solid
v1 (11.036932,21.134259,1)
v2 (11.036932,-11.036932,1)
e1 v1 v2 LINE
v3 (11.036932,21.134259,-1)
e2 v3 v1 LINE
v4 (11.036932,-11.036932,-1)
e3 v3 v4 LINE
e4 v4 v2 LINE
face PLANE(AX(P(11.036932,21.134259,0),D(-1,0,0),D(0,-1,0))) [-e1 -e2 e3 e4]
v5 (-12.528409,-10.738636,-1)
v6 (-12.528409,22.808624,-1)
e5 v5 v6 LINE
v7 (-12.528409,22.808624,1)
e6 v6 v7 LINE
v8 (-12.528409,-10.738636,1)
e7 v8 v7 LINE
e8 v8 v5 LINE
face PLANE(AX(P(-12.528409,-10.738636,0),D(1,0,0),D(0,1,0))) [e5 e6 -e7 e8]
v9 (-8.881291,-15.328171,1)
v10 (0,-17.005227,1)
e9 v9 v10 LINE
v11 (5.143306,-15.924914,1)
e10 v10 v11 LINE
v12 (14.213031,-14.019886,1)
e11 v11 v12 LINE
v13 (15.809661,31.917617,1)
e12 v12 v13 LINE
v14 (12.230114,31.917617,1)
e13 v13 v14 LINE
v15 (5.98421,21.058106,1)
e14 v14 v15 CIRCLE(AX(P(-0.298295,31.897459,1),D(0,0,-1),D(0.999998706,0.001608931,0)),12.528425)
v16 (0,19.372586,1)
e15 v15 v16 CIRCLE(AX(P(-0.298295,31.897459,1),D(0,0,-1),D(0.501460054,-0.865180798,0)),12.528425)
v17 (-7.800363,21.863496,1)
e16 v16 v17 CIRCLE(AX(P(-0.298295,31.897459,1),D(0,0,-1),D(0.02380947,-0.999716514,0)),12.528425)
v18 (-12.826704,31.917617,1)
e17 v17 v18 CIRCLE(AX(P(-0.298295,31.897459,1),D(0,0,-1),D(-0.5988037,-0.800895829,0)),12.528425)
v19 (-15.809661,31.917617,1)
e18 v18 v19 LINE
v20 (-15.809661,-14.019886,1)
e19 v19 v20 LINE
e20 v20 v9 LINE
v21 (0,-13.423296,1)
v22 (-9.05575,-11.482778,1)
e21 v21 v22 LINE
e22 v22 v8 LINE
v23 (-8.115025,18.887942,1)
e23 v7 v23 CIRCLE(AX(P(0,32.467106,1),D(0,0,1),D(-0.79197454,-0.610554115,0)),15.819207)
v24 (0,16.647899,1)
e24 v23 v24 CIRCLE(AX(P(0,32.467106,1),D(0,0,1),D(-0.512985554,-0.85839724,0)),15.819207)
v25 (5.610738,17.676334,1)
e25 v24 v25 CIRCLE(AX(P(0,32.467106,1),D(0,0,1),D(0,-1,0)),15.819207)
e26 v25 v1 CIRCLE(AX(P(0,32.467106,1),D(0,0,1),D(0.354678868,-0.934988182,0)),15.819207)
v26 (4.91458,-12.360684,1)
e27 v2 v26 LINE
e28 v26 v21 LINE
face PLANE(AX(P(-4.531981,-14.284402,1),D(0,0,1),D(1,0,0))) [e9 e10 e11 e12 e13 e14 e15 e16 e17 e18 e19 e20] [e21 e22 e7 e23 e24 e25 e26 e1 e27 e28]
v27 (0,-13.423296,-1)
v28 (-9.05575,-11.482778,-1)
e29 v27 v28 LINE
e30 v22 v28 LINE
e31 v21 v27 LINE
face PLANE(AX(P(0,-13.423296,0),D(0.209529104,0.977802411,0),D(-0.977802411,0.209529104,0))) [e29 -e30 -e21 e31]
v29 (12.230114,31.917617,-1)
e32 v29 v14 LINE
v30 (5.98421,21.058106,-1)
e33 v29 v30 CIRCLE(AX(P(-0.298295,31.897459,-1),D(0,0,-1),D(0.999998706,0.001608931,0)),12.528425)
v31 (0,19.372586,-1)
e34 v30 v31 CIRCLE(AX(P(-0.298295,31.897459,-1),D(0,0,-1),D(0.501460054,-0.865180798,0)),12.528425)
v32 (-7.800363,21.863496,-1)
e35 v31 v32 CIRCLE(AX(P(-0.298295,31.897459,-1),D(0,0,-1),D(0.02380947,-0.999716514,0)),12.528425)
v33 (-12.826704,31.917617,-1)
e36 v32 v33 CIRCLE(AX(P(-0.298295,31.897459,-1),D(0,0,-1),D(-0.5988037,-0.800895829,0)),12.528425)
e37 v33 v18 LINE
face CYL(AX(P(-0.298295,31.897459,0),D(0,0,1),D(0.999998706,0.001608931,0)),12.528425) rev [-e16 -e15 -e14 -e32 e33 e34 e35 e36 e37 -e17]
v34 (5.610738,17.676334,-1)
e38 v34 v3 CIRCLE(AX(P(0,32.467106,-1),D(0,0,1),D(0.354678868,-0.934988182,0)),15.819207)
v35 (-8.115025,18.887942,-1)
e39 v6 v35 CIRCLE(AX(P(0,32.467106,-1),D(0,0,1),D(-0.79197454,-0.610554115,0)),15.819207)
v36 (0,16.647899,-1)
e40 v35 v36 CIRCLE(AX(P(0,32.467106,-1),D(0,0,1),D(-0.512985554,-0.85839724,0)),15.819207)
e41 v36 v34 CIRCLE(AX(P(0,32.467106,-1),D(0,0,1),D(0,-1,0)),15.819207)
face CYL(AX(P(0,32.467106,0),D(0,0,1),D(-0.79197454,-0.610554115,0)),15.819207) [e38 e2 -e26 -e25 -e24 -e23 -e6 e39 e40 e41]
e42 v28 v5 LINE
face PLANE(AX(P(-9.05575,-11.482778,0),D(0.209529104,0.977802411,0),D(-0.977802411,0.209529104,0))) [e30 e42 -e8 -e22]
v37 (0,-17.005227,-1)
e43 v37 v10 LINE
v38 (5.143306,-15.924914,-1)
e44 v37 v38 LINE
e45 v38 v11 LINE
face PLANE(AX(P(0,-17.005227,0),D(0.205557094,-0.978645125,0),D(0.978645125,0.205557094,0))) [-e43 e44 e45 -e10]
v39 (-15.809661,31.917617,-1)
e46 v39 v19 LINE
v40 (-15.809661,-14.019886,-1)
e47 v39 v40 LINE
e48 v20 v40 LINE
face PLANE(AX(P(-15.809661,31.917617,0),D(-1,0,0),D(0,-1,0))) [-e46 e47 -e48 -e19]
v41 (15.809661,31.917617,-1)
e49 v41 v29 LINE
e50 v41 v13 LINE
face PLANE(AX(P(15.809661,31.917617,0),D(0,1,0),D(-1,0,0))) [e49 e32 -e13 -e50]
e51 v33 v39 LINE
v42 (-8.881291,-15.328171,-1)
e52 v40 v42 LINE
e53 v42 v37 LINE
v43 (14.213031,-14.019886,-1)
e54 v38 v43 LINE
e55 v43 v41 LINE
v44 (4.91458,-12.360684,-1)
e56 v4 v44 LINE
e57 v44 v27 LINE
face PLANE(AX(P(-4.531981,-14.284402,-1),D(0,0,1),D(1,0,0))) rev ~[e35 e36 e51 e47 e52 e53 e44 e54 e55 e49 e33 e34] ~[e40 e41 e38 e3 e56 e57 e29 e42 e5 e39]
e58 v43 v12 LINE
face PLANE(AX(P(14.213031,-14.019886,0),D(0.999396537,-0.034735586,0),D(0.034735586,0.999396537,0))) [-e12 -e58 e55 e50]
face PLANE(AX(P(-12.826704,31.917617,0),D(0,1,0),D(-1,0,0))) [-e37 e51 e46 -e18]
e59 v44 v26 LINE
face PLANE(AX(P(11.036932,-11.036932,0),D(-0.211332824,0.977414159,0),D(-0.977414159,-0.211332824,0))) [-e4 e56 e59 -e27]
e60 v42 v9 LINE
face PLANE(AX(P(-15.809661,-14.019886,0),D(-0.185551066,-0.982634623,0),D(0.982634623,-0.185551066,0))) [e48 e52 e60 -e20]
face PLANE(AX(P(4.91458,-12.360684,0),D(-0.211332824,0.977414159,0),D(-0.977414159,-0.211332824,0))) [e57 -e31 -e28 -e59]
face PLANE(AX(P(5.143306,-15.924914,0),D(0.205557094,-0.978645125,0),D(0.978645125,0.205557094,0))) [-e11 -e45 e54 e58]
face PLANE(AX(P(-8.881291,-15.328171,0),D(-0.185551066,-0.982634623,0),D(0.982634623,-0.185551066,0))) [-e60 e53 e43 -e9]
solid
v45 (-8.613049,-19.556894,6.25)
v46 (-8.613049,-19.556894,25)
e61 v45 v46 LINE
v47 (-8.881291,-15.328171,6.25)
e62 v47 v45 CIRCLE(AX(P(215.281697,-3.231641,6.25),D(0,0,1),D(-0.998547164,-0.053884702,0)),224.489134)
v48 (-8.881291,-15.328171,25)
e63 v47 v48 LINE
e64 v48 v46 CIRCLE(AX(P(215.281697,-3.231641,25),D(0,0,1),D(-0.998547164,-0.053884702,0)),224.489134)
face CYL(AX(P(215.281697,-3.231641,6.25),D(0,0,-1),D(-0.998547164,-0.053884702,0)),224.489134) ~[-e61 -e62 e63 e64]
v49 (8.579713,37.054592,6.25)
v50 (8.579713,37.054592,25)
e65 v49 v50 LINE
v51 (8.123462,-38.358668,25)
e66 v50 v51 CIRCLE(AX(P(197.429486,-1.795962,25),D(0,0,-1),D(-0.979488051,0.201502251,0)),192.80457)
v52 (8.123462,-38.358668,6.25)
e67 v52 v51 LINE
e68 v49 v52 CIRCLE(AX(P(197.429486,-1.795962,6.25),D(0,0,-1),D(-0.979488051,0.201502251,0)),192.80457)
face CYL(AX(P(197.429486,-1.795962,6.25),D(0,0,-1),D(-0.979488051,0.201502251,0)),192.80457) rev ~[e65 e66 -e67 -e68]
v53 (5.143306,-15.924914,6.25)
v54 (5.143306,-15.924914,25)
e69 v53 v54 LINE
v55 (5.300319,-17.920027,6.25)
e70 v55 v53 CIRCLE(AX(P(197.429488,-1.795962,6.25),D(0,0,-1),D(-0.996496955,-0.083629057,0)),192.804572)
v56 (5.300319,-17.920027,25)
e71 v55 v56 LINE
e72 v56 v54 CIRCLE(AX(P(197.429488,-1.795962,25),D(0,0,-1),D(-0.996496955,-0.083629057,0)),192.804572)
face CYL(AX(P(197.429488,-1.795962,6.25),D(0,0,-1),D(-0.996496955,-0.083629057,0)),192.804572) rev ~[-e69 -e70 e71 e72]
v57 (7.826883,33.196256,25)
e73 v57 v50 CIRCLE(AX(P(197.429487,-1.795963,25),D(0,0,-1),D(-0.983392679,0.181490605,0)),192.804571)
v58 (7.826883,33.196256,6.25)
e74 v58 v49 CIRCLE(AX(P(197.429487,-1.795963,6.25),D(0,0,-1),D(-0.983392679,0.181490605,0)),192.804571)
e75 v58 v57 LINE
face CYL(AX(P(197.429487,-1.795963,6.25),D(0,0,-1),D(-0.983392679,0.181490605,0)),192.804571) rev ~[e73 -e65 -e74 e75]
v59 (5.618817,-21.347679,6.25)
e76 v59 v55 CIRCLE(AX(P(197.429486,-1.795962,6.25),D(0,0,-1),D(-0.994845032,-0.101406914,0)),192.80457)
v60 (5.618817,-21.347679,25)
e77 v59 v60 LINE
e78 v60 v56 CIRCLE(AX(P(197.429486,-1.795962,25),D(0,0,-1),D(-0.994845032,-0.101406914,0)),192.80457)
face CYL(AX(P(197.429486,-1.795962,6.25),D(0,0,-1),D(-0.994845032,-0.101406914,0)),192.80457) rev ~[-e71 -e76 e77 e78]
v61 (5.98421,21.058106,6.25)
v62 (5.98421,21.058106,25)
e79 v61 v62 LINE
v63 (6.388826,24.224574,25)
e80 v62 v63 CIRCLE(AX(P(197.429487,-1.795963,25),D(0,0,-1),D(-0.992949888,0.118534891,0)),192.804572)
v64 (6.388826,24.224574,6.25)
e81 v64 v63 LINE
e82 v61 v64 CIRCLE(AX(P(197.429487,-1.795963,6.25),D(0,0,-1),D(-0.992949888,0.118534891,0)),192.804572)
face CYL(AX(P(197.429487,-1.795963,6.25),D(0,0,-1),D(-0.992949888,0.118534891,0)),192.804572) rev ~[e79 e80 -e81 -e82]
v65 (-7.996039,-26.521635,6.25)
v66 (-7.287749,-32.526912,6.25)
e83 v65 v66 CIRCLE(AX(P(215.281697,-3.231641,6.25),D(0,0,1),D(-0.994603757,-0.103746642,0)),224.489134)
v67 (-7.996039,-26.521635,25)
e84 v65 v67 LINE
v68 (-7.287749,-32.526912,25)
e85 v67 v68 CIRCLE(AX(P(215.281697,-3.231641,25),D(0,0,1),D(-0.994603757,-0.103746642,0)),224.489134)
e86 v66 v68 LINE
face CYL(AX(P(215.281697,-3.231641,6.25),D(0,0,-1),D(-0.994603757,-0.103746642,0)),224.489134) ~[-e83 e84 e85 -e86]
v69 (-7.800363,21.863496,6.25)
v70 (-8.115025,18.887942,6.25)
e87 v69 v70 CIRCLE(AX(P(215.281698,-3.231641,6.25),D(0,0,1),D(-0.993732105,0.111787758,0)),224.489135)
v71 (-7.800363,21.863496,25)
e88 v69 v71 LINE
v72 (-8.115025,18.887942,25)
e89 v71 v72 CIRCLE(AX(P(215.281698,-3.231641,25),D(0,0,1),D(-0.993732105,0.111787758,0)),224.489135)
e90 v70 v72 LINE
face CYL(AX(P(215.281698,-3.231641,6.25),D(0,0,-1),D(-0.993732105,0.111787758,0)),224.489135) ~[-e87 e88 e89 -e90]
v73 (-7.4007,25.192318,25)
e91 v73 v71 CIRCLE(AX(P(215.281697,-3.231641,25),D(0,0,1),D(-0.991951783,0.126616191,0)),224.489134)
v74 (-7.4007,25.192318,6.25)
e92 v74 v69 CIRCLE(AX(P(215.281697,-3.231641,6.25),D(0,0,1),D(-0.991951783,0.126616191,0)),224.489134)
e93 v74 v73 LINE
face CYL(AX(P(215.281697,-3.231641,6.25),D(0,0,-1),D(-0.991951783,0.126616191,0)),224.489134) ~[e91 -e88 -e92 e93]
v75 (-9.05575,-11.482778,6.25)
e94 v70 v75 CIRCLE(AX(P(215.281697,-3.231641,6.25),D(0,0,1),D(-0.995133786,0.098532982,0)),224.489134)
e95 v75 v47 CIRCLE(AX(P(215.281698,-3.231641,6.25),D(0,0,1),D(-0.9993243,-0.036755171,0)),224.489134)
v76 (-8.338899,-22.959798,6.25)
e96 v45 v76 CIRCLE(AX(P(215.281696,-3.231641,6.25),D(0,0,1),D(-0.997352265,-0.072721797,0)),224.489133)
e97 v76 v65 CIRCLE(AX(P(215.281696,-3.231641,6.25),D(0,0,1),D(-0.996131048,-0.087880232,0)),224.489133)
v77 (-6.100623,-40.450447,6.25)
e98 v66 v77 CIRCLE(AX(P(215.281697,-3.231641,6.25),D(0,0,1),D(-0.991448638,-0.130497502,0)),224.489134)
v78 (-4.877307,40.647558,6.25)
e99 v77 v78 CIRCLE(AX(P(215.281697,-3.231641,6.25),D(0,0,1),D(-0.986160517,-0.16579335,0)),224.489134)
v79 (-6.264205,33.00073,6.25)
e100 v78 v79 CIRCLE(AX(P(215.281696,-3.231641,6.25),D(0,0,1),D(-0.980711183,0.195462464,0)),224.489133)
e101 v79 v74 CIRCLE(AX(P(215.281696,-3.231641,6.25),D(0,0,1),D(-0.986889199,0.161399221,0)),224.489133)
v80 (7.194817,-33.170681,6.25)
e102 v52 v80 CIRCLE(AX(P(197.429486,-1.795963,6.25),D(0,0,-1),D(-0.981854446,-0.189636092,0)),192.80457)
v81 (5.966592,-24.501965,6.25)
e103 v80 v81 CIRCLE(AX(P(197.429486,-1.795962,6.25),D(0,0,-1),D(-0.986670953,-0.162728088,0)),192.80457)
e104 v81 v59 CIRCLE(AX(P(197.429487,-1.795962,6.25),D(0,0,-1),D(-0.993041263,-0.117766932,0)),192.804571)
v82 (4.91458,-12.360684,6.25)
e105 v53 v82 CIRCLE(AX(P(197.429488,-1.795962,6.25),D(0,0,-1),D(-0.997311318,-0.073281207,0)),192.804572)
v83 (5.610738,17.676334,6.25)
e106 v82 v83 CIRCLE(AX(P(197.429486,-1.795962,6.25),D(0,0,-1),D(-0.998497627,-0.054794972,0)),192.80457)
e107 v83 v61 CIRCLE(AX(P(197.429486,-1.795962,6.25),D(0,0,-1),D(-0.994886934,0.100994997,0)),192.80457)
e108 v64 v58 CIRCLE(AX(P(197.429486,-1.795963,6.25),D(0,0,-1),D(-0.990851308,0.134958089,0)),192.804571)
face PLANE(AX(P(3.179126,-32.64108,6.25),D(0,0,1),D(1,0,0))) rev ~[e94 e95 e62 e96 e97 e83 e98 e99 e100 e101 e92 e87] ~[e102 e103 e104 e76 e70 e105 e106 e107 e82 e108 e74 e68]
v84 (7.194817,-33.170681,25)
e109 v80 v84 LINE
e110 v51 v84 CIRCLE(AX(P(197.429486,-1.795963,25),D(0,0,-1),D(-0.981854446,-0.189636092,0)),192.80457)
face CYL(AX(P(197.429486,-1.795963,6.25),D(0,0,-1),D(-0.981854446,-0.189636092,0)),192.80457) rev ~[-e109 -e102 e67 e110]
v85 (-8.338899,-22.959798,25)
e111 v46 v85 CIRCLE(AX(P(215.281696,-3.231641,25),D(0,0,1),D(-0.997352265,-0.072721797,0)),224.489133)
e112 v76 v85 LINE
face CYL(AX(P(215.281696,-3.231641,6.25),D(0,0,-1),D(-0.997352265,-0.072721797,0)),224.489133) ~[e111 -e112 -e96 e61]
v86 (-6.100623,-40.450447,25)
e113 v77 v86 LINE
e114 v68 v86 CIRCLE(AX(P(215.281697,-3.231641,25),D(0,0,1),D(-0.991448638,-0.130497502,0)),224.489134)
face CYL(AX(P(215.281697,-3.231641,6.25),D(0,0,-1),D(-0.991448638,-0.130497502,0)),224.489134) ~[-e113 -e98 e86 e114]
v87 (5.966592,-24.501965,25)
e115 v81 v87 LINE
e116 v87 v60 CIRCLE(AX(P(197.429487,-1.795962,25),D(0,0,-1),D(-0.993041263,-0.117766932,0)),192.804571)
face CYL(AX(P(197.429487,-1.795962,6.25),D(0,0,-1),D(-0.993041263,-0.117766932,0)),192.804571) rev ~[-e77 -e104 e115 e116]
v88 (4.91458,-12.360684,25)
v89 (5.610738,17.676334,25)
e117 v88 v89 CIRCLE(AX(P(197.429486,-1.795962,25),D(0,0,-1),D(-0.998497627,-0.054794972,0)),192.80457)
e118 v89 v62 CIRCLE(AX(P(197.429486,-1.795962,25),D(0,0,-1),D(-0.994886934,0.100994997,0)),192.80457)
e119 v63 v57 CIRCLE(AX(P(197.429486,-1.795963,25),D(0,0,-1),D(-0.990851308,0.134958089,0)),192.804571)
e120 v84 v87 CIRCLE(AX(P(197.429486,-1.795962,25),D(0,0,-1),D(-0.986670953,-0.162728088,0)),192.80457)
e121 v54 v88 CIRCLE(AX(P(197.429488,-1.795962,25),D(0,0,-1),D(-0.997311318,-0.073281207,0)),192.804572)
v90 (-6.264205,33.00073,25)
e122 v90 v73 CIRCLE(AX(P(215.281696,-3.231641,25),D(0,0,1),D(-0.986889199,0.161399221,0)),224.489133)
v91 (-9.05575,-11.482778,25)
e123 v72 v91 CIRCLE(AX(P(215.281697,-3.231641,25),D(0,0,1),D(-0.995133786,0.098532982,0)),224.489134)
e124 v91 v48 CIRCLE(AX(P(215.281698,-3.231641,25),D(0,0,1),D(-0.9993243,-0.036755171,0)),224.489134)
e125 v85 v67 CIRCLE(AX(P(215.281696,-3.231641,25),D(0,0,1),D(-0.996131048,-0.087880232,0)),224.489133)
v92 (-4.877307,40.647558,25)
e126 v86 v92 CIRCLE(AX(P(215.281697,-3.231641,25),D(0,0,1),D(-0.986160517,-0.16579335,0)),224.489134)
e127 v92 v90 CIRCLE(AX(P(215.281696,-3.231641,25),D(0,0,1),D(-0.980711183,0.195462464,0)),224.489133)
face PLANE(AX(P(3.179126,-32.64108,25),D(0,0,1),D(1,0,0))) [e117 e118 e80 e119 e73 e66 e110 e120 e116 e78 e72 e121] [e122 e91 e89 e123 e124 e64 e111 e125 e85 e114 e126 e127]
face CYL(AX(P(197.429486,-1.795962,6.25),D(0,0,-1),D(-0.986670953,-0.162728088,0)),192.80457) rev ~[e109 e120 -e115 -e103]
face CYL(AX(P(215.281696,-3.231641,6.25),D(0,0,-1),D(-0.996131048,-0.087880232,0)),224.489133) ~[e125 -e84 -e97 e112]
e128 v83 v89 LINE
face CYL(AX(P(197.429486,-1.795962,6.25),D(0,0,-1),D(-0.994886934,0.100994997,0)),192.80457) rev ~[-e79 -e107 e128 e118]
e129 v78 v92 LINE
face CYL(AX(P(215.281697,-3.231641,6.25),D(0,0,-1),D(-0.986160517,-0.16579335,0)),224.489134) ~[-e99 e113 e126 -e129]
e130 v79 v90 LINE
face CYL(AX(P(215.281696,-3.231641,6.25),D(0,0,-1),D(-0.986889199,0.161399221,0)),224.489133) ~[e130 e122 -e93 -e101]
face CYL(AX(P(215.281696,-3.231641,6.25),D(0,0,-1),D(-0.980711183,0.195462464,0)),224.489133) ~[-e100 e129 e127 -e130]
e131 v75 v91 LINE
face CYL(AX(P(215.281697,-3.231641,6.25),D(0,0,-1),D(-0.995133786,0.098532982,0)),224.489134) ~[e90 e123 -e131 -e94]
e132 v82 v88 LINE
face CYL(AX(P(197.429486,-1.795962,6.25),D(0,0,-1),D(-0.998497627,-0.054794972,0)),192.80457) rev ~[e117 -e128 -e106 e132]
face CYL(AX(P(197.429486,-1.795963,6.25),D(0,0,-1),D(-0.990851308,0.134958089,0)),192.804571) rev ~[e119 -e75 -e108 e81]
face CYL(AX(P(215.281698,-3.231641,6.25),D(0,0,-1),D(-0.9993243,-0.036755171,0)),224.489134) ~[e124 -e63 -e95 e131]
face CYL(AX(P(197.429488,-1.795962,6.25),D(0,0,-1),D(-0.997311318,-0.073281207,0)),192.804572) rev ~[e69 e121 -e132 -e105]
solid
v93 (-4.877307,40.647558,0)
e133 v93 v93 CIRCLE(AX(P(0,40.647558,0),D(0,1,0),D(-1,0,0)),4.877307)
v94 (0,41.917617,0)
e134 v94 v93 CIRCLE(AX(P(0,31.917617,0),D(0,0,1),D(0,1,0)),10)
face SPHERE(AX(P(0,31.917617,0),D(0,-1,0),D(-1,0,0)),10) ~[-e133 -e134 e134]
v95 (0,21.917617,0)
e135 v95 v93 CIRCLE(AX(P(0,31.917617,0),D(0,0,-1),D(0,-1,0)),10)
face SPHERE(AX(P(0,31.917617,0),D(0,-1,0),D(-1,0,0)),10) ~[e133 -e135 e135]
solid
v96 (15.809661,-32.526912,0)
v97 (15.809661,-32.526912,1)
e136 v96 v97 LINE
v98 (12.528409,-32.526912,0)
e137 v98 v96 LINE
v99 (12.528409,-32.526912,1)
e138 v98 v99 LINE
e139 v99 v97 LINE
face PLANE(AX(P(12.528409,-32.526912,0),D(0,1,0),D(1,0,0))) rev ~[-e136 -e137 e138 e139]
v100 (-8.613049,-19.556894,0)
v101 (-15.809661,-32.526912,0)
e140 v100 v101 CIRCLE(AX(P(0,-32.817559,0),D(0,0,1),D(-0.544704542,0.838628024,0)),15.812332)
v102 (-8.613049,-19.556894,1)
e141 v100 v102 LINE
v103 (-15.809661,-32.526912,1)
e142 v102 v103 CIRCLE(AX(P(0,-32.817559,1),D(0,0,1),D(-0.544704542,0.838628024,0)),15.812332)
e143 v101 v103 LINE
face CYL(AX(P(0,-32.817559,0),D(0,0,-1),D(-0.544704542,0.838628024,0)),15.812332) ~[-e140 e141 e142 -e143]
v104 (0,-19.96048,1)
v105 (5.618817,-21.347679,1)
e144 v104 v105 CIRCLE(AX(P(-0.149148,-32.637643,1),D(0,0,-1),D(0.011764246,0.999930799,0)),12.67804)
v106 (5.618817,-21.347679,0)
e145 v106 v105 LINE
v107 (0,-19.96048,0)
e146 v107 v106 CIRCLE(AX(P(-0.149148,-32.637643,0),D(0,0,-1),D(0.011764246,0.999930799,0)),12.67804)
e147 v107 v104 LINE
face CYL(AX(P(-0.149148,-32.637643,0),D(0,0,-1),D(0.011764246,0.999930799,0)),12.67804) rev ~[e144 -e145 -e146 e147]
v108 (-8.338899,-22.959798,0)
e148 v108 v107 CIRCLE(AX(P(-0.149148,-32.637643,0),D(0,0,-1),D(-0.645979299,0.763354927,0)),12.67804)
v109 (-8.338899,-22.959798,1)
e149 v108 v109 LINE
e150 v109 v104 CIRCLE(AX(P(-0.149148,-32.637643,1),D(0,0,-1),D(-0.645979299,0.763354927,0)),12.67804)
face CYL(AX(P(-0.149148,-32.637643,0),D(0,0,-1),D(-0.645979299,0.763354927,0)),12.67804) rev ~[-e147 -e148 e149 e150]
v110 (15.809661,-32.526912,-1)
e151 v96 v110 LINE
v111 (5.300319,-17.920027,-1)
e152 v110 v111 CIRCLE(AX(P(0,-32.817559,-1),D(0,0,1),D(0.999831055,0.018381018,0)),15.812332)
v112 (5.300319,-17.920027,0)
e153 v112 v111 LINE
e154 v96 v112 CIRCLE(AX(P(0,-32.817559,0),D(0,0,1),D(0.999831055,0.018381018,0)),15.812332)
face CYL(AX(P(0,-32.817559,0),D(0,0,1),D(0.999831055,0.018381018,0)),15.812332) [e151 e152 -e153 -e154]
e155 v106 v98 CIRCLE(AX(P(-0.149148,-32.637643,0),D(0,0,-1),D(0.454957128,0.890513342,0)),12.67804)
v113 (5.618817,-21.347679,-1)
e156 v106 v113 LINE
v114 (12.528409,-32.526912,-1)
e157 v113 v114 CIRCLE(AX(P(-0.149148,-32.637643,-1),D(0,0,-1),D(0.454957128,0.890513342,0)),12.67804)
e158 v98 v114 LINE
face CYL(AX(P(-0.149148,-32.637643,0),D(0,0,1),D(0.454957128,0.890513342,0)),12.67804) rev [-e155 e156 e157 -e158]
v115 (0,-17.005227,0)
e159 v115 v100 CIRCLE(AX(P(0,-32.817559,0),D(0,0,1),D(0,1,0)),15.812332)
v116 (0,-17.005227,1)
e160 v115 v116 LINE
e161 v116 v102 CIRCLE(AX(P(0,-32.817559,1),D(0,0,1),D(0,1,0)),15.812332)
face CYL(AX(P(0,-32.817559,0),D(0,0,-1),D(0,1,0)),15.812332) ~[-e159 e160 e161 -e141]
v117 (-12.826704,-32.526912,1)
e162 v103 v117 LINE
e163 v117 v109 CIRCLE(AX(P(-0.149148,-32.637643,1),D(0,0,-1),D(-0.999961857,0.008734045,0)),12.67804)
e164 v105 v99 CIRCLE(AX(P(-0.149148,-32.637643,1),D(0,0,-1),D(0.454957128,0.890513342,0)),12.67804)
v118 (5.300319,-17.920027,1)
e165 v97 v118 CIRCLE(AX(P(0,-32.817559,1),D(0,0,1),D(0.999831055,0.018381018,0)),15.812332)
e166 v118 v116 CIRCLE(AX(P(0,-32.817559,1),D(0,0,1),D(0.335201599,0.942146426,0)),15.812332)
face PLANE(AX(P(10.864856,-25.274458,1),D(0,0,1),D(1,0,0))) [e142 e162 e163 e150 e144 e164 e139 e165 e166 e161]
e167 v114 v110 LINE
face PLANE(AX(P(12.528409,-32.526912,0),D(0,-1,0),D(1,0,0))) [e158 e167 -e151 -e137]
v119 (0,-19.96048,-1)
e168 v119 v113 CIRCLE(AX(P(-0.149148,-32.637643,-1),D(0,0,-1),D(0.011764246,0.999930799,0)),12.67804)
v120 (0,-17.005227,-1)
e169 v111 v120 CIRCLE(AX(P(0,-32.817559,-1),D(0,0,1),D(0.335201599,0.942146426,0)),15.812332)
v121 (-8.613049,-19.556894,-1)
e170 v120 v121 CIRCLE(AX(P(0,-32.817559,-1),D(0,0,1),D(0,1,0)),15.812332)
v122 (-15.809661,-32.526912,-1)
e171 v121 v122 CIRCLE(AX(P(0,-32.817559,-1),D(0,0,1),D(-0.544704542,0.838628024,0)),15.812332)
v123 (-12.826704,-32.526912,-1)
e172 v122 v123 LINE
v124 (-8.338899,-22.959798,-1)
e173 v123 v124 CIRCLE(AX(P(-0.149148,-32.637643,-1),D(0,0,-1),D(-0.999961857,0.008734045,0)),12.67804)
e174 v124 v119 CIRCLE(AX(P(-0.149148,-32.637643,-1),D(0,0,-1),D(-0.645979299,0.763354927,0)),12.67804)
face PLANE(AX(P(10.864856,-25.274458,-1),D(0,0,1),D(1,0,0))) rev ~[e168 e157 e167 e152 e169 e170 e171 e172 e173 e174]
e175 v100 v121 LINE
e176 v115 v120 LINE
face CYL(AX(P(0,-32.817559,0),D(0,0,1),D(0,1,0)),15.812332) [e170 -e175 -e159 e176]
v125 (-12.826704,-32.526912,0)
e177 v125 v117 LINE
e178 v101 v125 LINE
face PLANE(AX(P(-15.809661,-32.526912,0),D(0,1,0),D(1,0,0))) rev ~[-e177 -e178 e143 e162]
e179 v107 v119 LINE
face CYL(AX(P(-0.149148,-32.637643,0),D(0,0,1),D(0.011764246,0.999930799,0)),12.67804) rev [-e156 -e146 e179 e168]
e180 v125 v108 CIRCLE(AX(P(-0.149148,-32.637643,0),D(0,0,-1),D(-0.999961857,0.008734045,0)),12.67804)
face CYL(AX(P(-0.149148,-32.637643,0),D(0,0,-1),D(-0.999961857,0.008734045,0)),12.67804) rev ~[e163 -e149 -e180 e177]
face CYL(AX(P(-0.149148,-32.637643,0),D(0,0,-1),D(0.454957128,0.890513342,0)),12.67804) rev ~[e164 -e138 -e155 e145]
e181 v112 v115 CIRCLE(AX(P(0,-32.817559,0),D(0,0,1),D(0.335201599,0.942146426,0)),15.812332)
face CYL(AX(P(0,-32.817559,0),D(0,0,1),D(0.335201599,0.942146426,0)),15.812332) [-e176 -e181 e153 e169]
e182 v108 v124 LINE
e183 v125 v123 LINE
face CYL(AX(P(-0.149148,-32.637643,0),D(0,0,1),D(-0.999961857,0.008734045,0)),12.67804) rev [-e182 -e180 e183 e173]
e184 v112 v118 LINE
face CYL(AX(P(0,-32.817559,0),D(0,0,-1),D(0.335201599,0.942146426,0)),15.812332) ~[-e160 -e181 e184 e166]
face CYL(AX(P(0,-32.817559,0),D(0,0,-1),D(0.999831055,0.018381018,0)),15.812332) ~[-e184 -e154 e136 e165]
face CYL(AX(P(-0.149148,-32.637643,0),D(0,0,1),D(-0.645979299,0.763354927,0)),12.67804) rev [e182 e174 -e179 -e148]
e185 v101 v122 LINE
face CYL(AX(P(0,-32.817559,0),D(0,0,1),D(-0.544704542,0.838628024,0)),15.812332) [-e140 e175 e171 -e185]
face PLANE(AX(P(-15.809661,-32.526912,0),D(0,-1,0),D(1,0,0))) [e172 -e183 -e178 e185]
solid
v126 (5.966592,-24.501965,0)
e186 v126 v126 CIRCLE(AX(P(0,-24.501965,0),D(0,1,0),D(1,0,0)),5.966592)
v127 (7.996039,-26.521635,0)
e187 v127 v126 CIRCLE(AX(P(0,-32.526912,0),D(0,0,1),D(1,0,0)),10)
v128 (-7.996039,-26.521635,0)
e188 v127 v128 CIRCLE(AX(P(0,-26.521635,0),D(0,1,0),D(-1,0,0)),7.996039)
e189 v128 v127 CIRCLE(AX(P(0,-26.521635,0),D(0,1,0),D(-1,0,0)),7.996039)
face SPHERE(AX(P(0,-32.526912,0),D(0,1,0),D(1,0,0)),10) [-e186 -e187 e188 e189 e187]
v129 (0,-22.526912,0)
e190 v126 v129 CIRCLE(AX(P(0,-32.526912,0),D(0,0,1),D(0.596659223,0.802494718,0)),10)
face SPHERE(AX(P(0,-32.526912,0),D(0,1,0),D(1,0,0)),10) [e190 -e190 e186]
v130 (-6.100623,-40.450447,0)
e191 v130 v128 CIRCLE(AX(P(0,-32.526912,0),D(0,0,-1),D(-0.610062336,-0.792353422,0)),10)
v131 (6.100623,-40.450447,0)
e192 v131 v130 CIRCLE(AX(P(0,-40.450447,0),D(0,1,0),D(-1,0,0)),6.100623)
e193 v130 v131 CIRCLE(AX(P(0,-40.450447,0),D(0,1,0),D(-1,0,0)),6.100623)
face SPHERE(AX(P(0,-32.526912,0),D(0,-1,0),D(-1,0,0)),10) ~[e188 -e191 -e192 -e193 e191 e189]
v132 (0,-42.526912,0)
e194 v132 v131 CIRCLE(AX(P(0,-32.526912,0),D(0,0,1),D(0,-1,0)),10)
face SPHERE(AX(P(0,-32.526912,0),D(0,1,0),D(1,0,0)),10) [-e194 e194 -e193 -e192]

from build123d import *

# Parameters (mm, degrees)
F1_DEPTH      = 1
F1_DEPTH_BACK = 1
F3_START      = 6.25
F3_DEPTH      = 18.75


with BuildPart() as f1:
    # F0 (on Top) → F1 (new body, two sides)
    with BuildSketch(Plane.XY) as f1_sk:
        with BuildLine():
            ThreePointArc((5.3003190322, -17.9200269408), (5.4519181466, -19.6345637583), (5.6188172673, -21.3476788955))
            ThreePointArc((5.6188172673, -21.3476788955), (10.6352454567, -25.9720916376), (12.5284092501, -32.5269124468))
            Line((12.5284092501, -32.5269124468), (15.8096607774, -32.5269124468))
            ThreePointArc((15.8096607774, -32.5269124468), (12.8354231694, -23.5827467282), (5.3003190322, -17.9200269408))
        make_face()
        with BuildLine():
            ThreePointArc((0, -19.9604799519), (2.8896243917, -20.3291673494), (5.6188172673, -21.3476788955))
            ThreePointArc((5.6188172673, -21.3476788955), (5.4519181466, -19.6345637583), (5.3003190322, -17.9200269408))
            ThreePointArc((5.3003190322, -17.9200269408), (2.689341962, -17.2356052448), (0, -17.0052270113))
            Line((0, -17.0052270113), (0, -19.9604799519))
        make_face()
        with BuildLine():
            ThreePointArc((-8.3388992418, -22.9597984106), (-4.440045657, -20.7078105735), (0, -19.9604799519))
            Line((0, -19.9604799519), (0, -17.0052270113))
            ThreePointArc((0, -17.0052270113), (-4.4915370969, -17.6565584493), (-8.6130491677, -19.5568943105))
            ThreePointArc((-8.6130491677, -19.5568943105), (-8.4824430271, -21.2588675116), (-8.3388992418, -22.9597984106))
        make_face()
        with BuildLine():
            ThreePointArc((-12.8267044201, -32.5269124468), (-11.6271072761, -27.2534857181), (-8.3388992418, -22.9597984106))
            ThreePointArc((-8.3388992418, -22.9597984106), (-8.4824430271, -21.2588675116), (-8.6130491677, -19.5568943105))
            ThreePointArc((-8.6130491677, -19.5568943105), (-13.8265155726, -25.1457069814), (-15.8096607774, -32.5269124468))
            Line((-15.8096607774, -32.5269124468), (-12.8267044201, -32.5269124468))
        make_face()
    extrude(amount=F1_DEPTH)
    extrude(f1_sk.sketch, amount=-F1_DEPTH_BACK)


with BuildPart() as f1b:
    # F0 (on Top) → F1, piece 2 (new body, two sides)
    with BuildSketch(Plane.XY) as f1_2_sk:
        with BuildLine():
            Line((-8.881291048, -15.3281712863), (0, -17.0052270113))
            Line((0, -17.0052270113), (0, -13.4232956916))
            Line((0, -13.4232956916), (-9.05574971, -11.4827777524))
            ThreePointArc((-9.05574971, -11.4827777523), (-8.9767627231, -13.4058484598), (-8.881291048, -15.3281712863))
        make_face()
        with BuildLine():
            Line((-15.8096607774, -14.0198860317), (-8.881291048, -15.3281712863))
            ThreePointArc((-8.881291048, -15.3281712863), (-8.9767627231, -13.4058484598), (-9.05574971, -11.4827777523))
            Line((-9.05574971, -11.4827777524), (-12.5284092501, -10.738636367))
            Line((-12.5284092501, -10.738636367), (-12.5284092501, 22.808624168))
            ThreePointArc((-12.5284092501, 22.808624168), (-14.8830436931, 27.1059194382), (-15.8096607774, 31.917616725))
            Line((-15.8096607774, 31.917616725), (-15.8096607774, -14.0198860317))
        make_face()
        with BuildLine():
            Line((-12.8267044201, 31.917616725), (-15.8096607774, 31.917616725))
            ThreePointArc((-15.8096607774, 31.917616725), (-14.8830436931, 27.1059194382), (-12.5284092501, 22.808624168))
            ThreePointArc((-12.5284092501, 22.808624168), (-10.5062256605, 20.6405878581), (-8.1150247047, 18.8879424577))
            ThreePointArc((-8.1150247047, 18.8879424577), (-7.9626512783, 20.3762433144), (-7.8003626904, 21.8634956518))
            ThreePointArc((-7.8003626904, 21.8634956518), (-11.504380015, 26.2952180966), (-12.8267044201, 31.917616725))
        make_face()
        with BuildLine():
            ThreePointArc((-8.1150247047, 18.8879424577), (-4.2092582578, 17.2181895505), (0, 16.6478990731))
            Line((0, 16.6478990731), (0, 19.3725855164))
            ThreePointArc((0, 19.3725855164), (-4.1094291672, 19.9627745105), (-7.8003626904, 21.8634956518))
            ThreePointArc((-7.8003626904, 21.8634956518), (-7.9626512783, 20.3762433144), (-8.1150247047, 18.8879424577))
        make_face()
        with BuildLine():
            Line((0, 19.3725855164), (0, 16.6478990731))
            ThreePointArc((0, 16.6478990731), (2.8521073568, 16.9071319802), (5.6107384631, 17.6763344853))
            ThreePointArc((5.6107384631, 17.6763344853), (5.7900143917, 19.3680441711), (5.9842097449, 21.0581062067))
            ThreePointArc((5.9842097449, 21.0581062067), (3.0983174718, 19.8382526132), (0, 19.3725855164))
        make_face()
        with BuildLine():
            ThreePointArc((11.0369324684, 21.1342585721), (14.4656522663, 26.0645896884), (15.8096607774, 31.917616725))
            Line((15.8096607774, 31.917616725), (12.23011408, 31.917616725))
            ThreePointArc((12.23011408, 31.917616725), (10.5619472354, 25.6511340701), (5.9842097449, 21.0581062067))
            ThreePointArc((5.9842097449, 21.0581062067), (5.7900143917, 19.3680441711), (5.6107384631, 17.6763344853))
            ThreePointArc((5.6107384631, 17.6763344853), (8.5015026089, 19.1265002444), (11.0369324684, 21.1342585721))
        make_face()
        with BuildLine():
            ThreePointArc((4.914580284, -12.3606835702), (5.0206899204, -14.1433284216), (5.1433060929, -15.9249140063))
            Line((5.1433060929, -15.9249140063), (14.2130312032, -14.0198860317))
            Line((14.2130312032, -14.0198860317), (15.8096607774, 31.917616725))
            ThreePointArc((15.8096607774, 31.917616725), (14.4656522663, 26.0645896884), (11.0369324684, 21.1342585721))
            Line((11.0369324684, 21.1342585721), (11.0369324684, -11.0369315371))
            Line((11.0369324684, -11.0369315371), (4.914580284, -12.3606835702))
        make_face()
        with BuildLine():
            Line((0, -13.4232956916), (0, -17.0052270113))
            Line((0, -17.0052270113), (5.1433060929, -15.9249140063))
            ThreePointArc((5.1433060929, -15.9249140063), (5.0206899204, -14.1433284216), (4.914580284, -12.3606835702))
            Line((4.914580284, -12.3606835702), (0, -13.4232956916))
        make_face()
    extrude(amount=F1_DEPTH)
    extrude(f1_2_sk.sketch, amount=-F1_DEPTH_BACK)


with BuildPart() as f2:
    # F0 (on Top) → F2 (revolve)
    with BuildSketch(Plane.XY):
        with BuildLine():
            ThreePointArc((8.1234616975, -38.3586677614), (9.5193123957, -35.5900303865), (10, -32.5269124468))
            ThreePointArc((10, -32.5269124468), (8.9349292743, -28.0361398113), (5.9665922274, -24.5019652698))
            ThreePointArc((5.9665922274, -24.5019652698), (6.531492286, -28.8432959991), (7.1948170662, -33.1706814468))
            ThreePointArc((7.1948170662, -33.1706814468), (7.6414114113, -35.767847894), (8.1234616975, -38.3586677614))
        make_face()
        with BuildLine():
            ThreePointArc((7.1948170662, -33.1706814468), (6.531492286, -28.8432959991), (5.9665922274, -24.5019652698))
            ThreePointArc((5.9665922274, -24.5019652698), (3.142493296, -23.0335075842), (0, -22.5269124468))
            Line((0, -22.5269124468), (0, -42.5269124468))
            ThreePointArc((0, -42.5269124468), (4.5652188805, -41.4240342608), (8.1234616975, -38.3586677614))
            ThreePointArc((8.1234616975, -38.3586677614), (7.6414114113, -35.767847894), (7.1948170662, -33.1706814468))
        make_face()
        with BuildLine():
            ThreePointArc((-7.2877490893, -32.5269124468), (-7.6621150003, -29.5266586158), (-7.9960391137, -26.5216348935))
            ThreePointArc((-7.9960391137, -26.5216348935), (-9.908679156, -33.8752734454), (-6.1006233613, -40.4504466711))
            ThreePointArc((-6.1006233613, -40.4504466711), (-6.7295376984, -36.493976014), (-7.2877490893, -32.5269124468))
        make_face()
    revolve(axis=Axis((0, -0.3046478609, 0), (0, 1, 0)))


with BuildPart() as f2b:
    # F0 (on Top) → F2, piece 2 (revolve)
    with BuildSketch(Plane.XY):
        with BuildLine():
            ThreePointArc((10, 31.917616725), (9.6383902497, 34.5824682021), (8.5797133209, 37.0545924239))
            ThreePointArc((8.5797133209, 37.0545924239), (8.1934646149, 35.1273427272), (7.8268833458, 33.1962555647))
            ThreePointArc((7.8268833458, 33.1962555647), (7.0549966282, 28.718887232), (6.3888255555, 24.2245738926))
            ThreePointArc((6.3888255555, 24.2245738926), (9.0522995851, 27.6683965351), (10, 31.917616725))
        make_face()
        with BuildLine():
            Line((0, 21.917616725), (0, 41.917616725))
            ThreePointArc((0, 41.917616725), (-2.5199788975, 41.5948945631), (-4.8773071875, 40.6475579962))
            ThreePointArc((-4.8773071875, 40.6475579962), (-5.6038490401, 36.8301460552), (-6.264204625, 33.0007299781))
            ThreePointArc((-6.264204625, 33.0007299781), (-6.8667625523, 29.1015177407), (-7.4006996933, 25.1923179175))
            ThreePointArc((-7.4006996933, 25.1923179175), (-4.046418906, 22.7728644573), (0, 21.917616725))
        make_face()
        with BuildLine():
            ThreePointArc((-6.264204625, 33.0007299781), (-5.6038490401, 36.8301460552), (-4.8773071875, 40.6475579962))
            ThreePointArc((-4.8773071875, 40.6475579962), (-9.8693198709, 33.5289904514), (-7.4006996933, 25.1923179175))
            ThreePointArc((-7.4006996933, 25.1923179175), (-6.8667625523, 29.1015177407), (-6.264204625, 33.0007299781))
        make_face()
    revolve(axis=Axis((0, -0.3046478609, 0), (0, 1, 0)))


with BuildPart() as f3:
    # F0 (on Top) → F3 (new body)
    with BuildSketch(Plane.XY.offset(F3_START)):
        with BuildLine():
            ThreePointArc((7.1948170662, -33.1706814468), (6.531492286, -28.8432959991), (5.9665922274, -24.5019652698))
            ThreePointArc((5.9665922274, -24.5019652698), (3.142493296, -23.0335075842), (0, -22.5269124468))
            Line((0, -22.5269124468), (0, -42.5269124468))
            ThreePointArc((0, -42.5269124468), (4.5652188805, -41.4240342608), (8.1234616975, -38.3586677614))
            ThreePointArc((8.1234616975, -38.3586677614), (7.6414114113, -35.767847894), (7.1948170662, -33.1706814468))
        make_face()
        with BuildLine():
            ThreePointArc((0, -22.5269124468), (3.142493296, -23.0335075842), (5.9665922274, -24.5019652698))
            ThreePointArc((5.9665922274, -24.5019652698), (5.7862150263, -22.9255376051), (5.6188172673, -21.3476788955))
            ThreePointArc((5.6188172673, -21.3476788955), (2.8896243917, -20.3291673494), (0, -19.9604799519))
            Line((0, -19.9604799519), (0, -22.5269124468))
        make_face()
        with BuildLine():
            ThreePointArc((390.2340564281, -1.7959624641), (215.7943387416, -193.7239033847), (8.1234616975, -38.3586677614))
            ThreePointArc((8.1234616975, -38.3586677614), (4.5652188805, -41.4240342608), (0, -42.5269124468))
            ThreePointArc((0, -42.5269124468), (-3.2221621434, -41.9935734802), (-6.1006233613, -40.4504466711))
            ThreePointArc((-6.1006233613, -40.4504466711), (233.955821601, -226.942723079), (439.7708302282, -3.2316412089))
            ThreePointArc((439.7708302282, -3.2316412089), (237.3278649488, 220.1723371745), (-4.8773071875, 40.6475579962))
            ThreePointArc((-4.8773071875, 40.6475579962), (-2.5199788975, 41.5948945631), (0, 41.917616725))
            ThreePointArc((0, 41.917616725), (4.9310365549, 40.6173223806), (8.5797133209, 37.0545924239))
            ThreePointArc((8.5797133209, 37.0545924239), (216.9551490026, 190.0173603447), (390.2340564281, -1.7959624641))
        make_face()
        with BuildLine():
            Line((0, -42.5269124468), (0, -22.5269124468))
            ThreePointArc((0, -22.5269124468), (-4.4691847393, -23.5811655374), (-7.9960391137, -26.5216348935))
            ThreePointArc((-7.9960391137, -26.5216348935), (-7.6621150003, -29.5266586158), (-7.2877490893, -32.5269124468))
            ThreePointArc((-7.2877490893, -32.5269124468), (-6.7295376984, -36.493976014), (-6.1006233613, -40.4504466711))
            ThreePointArc((-6.1006233613, -40.4504466711), (-3.2221621434, -41.9935734802), (0, -42.5269124468))
        make_face()
        with BuildLine():
            ThreePointArc((-7.9960391137, -26.5216348935), (-4.4691847393, -23.5811655374), (0, -22.5269124468))
            Line((0, -22.5269124468), (0, -19.9604799519))
            ThreePointArc((0, -19.9604799519), (-4.440045657, -20.7078105735), (-8.3388992418, -22.9597984106))
            ThreePointArc((-8.3388992418, -22.9597984106), (-8.1745661374, -24.7413998009), (-7.9960391137, -26.5216348935))
        make_face()
        with BuildLine():
            ThreePointArc((0, -19.9604799519), (2.8896243917, -20.3291673494), (5.6188172673, -21.3476788955))
            ThreePointArc((5.6188172673, -21.3476788955), (5.4519181466, -19.6345637583), (5.3003190322, -17.9200269408))
            ThreePointArc((5.3003190322, -17.9200269408), (2.689341962, -17.2356052448), (0, -17.0052270113))
            Line((0, -17.0052270113), (0, -19.9604799519))
        make_face()
        with BuildLine():
            ThreePointArc((-8.3388992418, -22.9597984106), (-4.440045657, -20.7078105735), (0, -19.9604799519))
            Line((0, -19.9604799519), (0, -17.0052270113))
            ThreePointArc((0, -17.0052270113), (-4.4915370969, -17.6565584493), (-8.6130491677, -19.5568943105))
            ThreePointArc((-8.6130491677, -19.5568943105), (-8.4824430271, -21.2588675116), (-8.3388992418, -22.9597984106))
        make_face()
        with BuildLine():
            ThreePointArc((0, -17.0052270113), (2.689341962, -17.2356052448), (5.3003190322, -17.9200269408))
            ThreePointArc((5.3003190322, -17.9200269408), (5.2192239245, -16.9226741962), (5.1433060929, -15.9249140063))
            Line((5.1433060929, -15.9249140063), (0, -17.0052270113))
        make_face()
        with BuildLine():
            ThreePointArc((7.8268833458, 33.1962555647), (8.1934646149, 35.1273427272), (8.5797133209, 37.0545924239))
            ThreePointArc((8.5797133209, 37.0545924239), (4.9310365549, 40.6173223806), (0, 41.917616725))
            Line((0, 41.917616725), (0, 21.917616725))
            ThreePointArc((0, 21.917616725), (3.3962900109, 22.512021892), (6.3888255555, 24.2245738926))
            ThreePointArc((6.3888255555, 24.2245738926), (7.0549966282, 28.718887232), (7.8268833458, 33.1962555647))
        make_face()
        with BuildLine():
            ThreePointArc((-8.6130491677, -19.5568943105), (-4.4915370969, -17.6565584493), (0, -17.0052270113))
            Line((0, -17.0052270113), (-8.881291048, -15.3281712863))
            ThreePointArc((-8.881291048, -15.3281712863), (-8.7571474494, -17.4431656942), (-8.6130491677, -19.5568943105))
        make_face()
        with BuildLine():
            Line((0, -13.4232956916), (0, -17.0052270113))
            Line((0, -17.0052270113), (5.1433060929, -15.9249140063))
            ThreePointArc((5.1433060929, -15.9249140063), (5.0206899204, -14.1433284216), (4.914580284, -12.3606835702))
            Line((4.914580284, -12.3606835702), (0, -13.4232956916))
        make_face()
        with BuildLine():
            Line((-8.881291048, -15.3281712863), (0, -17.0052270113))
            Line((0, -17.0052270113), (0, -13.4232956916))
            Line((0, -13.4232956916), (-9.05574971, -11.4827777524))
            ThreePointArc((-9.05574971, -11.4827777523), (-8.9767627231, -13.4058484598), (-8.881291048, -15.3281712863))
        make_face()
        with BuildLine():
            Line((0, 21.917616725), (0, 41.917616725))
            ThreePointArc((0, 41.917616725), (-2.5199788975, 41.5948945631), (-4.8773071875, 40.6475579962))
            ThreePointArc((-4.8773071875, 40.6475579962), (-5.6038490401, 36.8301460552), (-6.264204625, 33.0007299781))
            ThreePointArc((-6.264204625, 33.0007299781), (-6.8667625523, 29.1015177407), (-7.4006996933, 25.1923179175))
            ThreePointArc((-7.4006996933, 25.1923179175), (-4.046418906, 22.7728644573), (0, 21.917616725))
        make_face()
        with BuildLine():
            Line((0, 16.6478990731), (0, -13.4232956916))
            Line((0, -13.4232956916), (4.914580284, -12.3606835702))
            ThreePointArc((4.914580284, -12.3606835702), (4.676678319, 2.6714065495), (5.6107384631, 17.6763344853))
            ThreePointArc((5.6107384631, 17.6763344853), (2.8521073568, 16.9071319802), (0, 16.6478990731))
        make_face()
        with BuildLine():
            Line((-9.05574971, -11.4827777524), (0, -13.4232956916))
            Line((0, -13.4232956916), (0, 16.6478990731))
            ThreePointArc((0, 16.6478990731), (-4.2092582578, 17.2181895505), (-8.1150247047, 18.8879424577))
            ThreePointArc((-8.1150247047, 18.8879424577), (-9.0998230799, 3.7185168674), (-9.05574971, -11.4827777523))
        make_face()
        with BuildLine():
            ThreePointArc((5.9842097449, 21.0581062067), (6.1799642421, 22.6421774536), (6.3888255555, 24.2245738926))
            ThreePointArc((6.3888255555, 24.2245738926), (3.3962900109, 22.512021892), (0, 21.917616725))
            Line((0, 21.917616725), (0, 19.3725855164))
            ThreePointArc((0, 19.3725855164), (3.0983174718, 19.8382526132), (5.9842097449, 21.0581062067))
        make_face()
        with BuildLine():
            Line((0, 19.3725855164), (0, 21.917616725))
            ThreePointArc((0, 21.917616725), (-4.046418906, 22.7728644573), (-7.4006996933, 25.1923179175))
            ThreePointArc((-7.4006996933, 25.1923179175), (-7.6067457425, 23.5286529122), (-7.8003626904, 21.8634956518))
            ThreePointArc((-7.8003626904, 21.8634956518), (-4.1094291672, 19.9627745105), (0, 19.3725855164))
        make_face()
        with BuildLine():
            Line((0, 19.3725855164), (0, 16.6478990731))
            ThreePointArc((0, 16.6478990731), (2.8521073568, 16.9071319802), (5.6107384631, 17.6763344853))
            ThreePointArc((5.6107384631, 17.6763344853), (5.7900143917, 19.3680441711), (5.9842097449, 21.0581062067))
            ThreePointArc((5.9842097449, 21.0581062067), (3.0983174718, 19.8382526132), (0, 19.3725855164))
        make_face()
        with BuildLine():
            ThreePointArc((-8.1150247047, 18.8879424577), (-4.2092582578, 17.2181895505), (0, 16.6478990731))
            Line((0, 16.6478990731), (0, 19.3725855164))
            ThreePointArc((0, 19.3725855164), (-4.1094291672, 19.9627745105), (-7.8003626904, 21.8634956518))
            ThreePointArc((-7.8003626904, 21.8634956518), (-7.9626512783, 20.3762433144), (-8.1150247047, 18.8879424577))
        make_face()
    extrude(amount=F3_DEPTH)


solid = Compound([f1.part, f1b.part, f2.part, f2b.part, f3.part])
